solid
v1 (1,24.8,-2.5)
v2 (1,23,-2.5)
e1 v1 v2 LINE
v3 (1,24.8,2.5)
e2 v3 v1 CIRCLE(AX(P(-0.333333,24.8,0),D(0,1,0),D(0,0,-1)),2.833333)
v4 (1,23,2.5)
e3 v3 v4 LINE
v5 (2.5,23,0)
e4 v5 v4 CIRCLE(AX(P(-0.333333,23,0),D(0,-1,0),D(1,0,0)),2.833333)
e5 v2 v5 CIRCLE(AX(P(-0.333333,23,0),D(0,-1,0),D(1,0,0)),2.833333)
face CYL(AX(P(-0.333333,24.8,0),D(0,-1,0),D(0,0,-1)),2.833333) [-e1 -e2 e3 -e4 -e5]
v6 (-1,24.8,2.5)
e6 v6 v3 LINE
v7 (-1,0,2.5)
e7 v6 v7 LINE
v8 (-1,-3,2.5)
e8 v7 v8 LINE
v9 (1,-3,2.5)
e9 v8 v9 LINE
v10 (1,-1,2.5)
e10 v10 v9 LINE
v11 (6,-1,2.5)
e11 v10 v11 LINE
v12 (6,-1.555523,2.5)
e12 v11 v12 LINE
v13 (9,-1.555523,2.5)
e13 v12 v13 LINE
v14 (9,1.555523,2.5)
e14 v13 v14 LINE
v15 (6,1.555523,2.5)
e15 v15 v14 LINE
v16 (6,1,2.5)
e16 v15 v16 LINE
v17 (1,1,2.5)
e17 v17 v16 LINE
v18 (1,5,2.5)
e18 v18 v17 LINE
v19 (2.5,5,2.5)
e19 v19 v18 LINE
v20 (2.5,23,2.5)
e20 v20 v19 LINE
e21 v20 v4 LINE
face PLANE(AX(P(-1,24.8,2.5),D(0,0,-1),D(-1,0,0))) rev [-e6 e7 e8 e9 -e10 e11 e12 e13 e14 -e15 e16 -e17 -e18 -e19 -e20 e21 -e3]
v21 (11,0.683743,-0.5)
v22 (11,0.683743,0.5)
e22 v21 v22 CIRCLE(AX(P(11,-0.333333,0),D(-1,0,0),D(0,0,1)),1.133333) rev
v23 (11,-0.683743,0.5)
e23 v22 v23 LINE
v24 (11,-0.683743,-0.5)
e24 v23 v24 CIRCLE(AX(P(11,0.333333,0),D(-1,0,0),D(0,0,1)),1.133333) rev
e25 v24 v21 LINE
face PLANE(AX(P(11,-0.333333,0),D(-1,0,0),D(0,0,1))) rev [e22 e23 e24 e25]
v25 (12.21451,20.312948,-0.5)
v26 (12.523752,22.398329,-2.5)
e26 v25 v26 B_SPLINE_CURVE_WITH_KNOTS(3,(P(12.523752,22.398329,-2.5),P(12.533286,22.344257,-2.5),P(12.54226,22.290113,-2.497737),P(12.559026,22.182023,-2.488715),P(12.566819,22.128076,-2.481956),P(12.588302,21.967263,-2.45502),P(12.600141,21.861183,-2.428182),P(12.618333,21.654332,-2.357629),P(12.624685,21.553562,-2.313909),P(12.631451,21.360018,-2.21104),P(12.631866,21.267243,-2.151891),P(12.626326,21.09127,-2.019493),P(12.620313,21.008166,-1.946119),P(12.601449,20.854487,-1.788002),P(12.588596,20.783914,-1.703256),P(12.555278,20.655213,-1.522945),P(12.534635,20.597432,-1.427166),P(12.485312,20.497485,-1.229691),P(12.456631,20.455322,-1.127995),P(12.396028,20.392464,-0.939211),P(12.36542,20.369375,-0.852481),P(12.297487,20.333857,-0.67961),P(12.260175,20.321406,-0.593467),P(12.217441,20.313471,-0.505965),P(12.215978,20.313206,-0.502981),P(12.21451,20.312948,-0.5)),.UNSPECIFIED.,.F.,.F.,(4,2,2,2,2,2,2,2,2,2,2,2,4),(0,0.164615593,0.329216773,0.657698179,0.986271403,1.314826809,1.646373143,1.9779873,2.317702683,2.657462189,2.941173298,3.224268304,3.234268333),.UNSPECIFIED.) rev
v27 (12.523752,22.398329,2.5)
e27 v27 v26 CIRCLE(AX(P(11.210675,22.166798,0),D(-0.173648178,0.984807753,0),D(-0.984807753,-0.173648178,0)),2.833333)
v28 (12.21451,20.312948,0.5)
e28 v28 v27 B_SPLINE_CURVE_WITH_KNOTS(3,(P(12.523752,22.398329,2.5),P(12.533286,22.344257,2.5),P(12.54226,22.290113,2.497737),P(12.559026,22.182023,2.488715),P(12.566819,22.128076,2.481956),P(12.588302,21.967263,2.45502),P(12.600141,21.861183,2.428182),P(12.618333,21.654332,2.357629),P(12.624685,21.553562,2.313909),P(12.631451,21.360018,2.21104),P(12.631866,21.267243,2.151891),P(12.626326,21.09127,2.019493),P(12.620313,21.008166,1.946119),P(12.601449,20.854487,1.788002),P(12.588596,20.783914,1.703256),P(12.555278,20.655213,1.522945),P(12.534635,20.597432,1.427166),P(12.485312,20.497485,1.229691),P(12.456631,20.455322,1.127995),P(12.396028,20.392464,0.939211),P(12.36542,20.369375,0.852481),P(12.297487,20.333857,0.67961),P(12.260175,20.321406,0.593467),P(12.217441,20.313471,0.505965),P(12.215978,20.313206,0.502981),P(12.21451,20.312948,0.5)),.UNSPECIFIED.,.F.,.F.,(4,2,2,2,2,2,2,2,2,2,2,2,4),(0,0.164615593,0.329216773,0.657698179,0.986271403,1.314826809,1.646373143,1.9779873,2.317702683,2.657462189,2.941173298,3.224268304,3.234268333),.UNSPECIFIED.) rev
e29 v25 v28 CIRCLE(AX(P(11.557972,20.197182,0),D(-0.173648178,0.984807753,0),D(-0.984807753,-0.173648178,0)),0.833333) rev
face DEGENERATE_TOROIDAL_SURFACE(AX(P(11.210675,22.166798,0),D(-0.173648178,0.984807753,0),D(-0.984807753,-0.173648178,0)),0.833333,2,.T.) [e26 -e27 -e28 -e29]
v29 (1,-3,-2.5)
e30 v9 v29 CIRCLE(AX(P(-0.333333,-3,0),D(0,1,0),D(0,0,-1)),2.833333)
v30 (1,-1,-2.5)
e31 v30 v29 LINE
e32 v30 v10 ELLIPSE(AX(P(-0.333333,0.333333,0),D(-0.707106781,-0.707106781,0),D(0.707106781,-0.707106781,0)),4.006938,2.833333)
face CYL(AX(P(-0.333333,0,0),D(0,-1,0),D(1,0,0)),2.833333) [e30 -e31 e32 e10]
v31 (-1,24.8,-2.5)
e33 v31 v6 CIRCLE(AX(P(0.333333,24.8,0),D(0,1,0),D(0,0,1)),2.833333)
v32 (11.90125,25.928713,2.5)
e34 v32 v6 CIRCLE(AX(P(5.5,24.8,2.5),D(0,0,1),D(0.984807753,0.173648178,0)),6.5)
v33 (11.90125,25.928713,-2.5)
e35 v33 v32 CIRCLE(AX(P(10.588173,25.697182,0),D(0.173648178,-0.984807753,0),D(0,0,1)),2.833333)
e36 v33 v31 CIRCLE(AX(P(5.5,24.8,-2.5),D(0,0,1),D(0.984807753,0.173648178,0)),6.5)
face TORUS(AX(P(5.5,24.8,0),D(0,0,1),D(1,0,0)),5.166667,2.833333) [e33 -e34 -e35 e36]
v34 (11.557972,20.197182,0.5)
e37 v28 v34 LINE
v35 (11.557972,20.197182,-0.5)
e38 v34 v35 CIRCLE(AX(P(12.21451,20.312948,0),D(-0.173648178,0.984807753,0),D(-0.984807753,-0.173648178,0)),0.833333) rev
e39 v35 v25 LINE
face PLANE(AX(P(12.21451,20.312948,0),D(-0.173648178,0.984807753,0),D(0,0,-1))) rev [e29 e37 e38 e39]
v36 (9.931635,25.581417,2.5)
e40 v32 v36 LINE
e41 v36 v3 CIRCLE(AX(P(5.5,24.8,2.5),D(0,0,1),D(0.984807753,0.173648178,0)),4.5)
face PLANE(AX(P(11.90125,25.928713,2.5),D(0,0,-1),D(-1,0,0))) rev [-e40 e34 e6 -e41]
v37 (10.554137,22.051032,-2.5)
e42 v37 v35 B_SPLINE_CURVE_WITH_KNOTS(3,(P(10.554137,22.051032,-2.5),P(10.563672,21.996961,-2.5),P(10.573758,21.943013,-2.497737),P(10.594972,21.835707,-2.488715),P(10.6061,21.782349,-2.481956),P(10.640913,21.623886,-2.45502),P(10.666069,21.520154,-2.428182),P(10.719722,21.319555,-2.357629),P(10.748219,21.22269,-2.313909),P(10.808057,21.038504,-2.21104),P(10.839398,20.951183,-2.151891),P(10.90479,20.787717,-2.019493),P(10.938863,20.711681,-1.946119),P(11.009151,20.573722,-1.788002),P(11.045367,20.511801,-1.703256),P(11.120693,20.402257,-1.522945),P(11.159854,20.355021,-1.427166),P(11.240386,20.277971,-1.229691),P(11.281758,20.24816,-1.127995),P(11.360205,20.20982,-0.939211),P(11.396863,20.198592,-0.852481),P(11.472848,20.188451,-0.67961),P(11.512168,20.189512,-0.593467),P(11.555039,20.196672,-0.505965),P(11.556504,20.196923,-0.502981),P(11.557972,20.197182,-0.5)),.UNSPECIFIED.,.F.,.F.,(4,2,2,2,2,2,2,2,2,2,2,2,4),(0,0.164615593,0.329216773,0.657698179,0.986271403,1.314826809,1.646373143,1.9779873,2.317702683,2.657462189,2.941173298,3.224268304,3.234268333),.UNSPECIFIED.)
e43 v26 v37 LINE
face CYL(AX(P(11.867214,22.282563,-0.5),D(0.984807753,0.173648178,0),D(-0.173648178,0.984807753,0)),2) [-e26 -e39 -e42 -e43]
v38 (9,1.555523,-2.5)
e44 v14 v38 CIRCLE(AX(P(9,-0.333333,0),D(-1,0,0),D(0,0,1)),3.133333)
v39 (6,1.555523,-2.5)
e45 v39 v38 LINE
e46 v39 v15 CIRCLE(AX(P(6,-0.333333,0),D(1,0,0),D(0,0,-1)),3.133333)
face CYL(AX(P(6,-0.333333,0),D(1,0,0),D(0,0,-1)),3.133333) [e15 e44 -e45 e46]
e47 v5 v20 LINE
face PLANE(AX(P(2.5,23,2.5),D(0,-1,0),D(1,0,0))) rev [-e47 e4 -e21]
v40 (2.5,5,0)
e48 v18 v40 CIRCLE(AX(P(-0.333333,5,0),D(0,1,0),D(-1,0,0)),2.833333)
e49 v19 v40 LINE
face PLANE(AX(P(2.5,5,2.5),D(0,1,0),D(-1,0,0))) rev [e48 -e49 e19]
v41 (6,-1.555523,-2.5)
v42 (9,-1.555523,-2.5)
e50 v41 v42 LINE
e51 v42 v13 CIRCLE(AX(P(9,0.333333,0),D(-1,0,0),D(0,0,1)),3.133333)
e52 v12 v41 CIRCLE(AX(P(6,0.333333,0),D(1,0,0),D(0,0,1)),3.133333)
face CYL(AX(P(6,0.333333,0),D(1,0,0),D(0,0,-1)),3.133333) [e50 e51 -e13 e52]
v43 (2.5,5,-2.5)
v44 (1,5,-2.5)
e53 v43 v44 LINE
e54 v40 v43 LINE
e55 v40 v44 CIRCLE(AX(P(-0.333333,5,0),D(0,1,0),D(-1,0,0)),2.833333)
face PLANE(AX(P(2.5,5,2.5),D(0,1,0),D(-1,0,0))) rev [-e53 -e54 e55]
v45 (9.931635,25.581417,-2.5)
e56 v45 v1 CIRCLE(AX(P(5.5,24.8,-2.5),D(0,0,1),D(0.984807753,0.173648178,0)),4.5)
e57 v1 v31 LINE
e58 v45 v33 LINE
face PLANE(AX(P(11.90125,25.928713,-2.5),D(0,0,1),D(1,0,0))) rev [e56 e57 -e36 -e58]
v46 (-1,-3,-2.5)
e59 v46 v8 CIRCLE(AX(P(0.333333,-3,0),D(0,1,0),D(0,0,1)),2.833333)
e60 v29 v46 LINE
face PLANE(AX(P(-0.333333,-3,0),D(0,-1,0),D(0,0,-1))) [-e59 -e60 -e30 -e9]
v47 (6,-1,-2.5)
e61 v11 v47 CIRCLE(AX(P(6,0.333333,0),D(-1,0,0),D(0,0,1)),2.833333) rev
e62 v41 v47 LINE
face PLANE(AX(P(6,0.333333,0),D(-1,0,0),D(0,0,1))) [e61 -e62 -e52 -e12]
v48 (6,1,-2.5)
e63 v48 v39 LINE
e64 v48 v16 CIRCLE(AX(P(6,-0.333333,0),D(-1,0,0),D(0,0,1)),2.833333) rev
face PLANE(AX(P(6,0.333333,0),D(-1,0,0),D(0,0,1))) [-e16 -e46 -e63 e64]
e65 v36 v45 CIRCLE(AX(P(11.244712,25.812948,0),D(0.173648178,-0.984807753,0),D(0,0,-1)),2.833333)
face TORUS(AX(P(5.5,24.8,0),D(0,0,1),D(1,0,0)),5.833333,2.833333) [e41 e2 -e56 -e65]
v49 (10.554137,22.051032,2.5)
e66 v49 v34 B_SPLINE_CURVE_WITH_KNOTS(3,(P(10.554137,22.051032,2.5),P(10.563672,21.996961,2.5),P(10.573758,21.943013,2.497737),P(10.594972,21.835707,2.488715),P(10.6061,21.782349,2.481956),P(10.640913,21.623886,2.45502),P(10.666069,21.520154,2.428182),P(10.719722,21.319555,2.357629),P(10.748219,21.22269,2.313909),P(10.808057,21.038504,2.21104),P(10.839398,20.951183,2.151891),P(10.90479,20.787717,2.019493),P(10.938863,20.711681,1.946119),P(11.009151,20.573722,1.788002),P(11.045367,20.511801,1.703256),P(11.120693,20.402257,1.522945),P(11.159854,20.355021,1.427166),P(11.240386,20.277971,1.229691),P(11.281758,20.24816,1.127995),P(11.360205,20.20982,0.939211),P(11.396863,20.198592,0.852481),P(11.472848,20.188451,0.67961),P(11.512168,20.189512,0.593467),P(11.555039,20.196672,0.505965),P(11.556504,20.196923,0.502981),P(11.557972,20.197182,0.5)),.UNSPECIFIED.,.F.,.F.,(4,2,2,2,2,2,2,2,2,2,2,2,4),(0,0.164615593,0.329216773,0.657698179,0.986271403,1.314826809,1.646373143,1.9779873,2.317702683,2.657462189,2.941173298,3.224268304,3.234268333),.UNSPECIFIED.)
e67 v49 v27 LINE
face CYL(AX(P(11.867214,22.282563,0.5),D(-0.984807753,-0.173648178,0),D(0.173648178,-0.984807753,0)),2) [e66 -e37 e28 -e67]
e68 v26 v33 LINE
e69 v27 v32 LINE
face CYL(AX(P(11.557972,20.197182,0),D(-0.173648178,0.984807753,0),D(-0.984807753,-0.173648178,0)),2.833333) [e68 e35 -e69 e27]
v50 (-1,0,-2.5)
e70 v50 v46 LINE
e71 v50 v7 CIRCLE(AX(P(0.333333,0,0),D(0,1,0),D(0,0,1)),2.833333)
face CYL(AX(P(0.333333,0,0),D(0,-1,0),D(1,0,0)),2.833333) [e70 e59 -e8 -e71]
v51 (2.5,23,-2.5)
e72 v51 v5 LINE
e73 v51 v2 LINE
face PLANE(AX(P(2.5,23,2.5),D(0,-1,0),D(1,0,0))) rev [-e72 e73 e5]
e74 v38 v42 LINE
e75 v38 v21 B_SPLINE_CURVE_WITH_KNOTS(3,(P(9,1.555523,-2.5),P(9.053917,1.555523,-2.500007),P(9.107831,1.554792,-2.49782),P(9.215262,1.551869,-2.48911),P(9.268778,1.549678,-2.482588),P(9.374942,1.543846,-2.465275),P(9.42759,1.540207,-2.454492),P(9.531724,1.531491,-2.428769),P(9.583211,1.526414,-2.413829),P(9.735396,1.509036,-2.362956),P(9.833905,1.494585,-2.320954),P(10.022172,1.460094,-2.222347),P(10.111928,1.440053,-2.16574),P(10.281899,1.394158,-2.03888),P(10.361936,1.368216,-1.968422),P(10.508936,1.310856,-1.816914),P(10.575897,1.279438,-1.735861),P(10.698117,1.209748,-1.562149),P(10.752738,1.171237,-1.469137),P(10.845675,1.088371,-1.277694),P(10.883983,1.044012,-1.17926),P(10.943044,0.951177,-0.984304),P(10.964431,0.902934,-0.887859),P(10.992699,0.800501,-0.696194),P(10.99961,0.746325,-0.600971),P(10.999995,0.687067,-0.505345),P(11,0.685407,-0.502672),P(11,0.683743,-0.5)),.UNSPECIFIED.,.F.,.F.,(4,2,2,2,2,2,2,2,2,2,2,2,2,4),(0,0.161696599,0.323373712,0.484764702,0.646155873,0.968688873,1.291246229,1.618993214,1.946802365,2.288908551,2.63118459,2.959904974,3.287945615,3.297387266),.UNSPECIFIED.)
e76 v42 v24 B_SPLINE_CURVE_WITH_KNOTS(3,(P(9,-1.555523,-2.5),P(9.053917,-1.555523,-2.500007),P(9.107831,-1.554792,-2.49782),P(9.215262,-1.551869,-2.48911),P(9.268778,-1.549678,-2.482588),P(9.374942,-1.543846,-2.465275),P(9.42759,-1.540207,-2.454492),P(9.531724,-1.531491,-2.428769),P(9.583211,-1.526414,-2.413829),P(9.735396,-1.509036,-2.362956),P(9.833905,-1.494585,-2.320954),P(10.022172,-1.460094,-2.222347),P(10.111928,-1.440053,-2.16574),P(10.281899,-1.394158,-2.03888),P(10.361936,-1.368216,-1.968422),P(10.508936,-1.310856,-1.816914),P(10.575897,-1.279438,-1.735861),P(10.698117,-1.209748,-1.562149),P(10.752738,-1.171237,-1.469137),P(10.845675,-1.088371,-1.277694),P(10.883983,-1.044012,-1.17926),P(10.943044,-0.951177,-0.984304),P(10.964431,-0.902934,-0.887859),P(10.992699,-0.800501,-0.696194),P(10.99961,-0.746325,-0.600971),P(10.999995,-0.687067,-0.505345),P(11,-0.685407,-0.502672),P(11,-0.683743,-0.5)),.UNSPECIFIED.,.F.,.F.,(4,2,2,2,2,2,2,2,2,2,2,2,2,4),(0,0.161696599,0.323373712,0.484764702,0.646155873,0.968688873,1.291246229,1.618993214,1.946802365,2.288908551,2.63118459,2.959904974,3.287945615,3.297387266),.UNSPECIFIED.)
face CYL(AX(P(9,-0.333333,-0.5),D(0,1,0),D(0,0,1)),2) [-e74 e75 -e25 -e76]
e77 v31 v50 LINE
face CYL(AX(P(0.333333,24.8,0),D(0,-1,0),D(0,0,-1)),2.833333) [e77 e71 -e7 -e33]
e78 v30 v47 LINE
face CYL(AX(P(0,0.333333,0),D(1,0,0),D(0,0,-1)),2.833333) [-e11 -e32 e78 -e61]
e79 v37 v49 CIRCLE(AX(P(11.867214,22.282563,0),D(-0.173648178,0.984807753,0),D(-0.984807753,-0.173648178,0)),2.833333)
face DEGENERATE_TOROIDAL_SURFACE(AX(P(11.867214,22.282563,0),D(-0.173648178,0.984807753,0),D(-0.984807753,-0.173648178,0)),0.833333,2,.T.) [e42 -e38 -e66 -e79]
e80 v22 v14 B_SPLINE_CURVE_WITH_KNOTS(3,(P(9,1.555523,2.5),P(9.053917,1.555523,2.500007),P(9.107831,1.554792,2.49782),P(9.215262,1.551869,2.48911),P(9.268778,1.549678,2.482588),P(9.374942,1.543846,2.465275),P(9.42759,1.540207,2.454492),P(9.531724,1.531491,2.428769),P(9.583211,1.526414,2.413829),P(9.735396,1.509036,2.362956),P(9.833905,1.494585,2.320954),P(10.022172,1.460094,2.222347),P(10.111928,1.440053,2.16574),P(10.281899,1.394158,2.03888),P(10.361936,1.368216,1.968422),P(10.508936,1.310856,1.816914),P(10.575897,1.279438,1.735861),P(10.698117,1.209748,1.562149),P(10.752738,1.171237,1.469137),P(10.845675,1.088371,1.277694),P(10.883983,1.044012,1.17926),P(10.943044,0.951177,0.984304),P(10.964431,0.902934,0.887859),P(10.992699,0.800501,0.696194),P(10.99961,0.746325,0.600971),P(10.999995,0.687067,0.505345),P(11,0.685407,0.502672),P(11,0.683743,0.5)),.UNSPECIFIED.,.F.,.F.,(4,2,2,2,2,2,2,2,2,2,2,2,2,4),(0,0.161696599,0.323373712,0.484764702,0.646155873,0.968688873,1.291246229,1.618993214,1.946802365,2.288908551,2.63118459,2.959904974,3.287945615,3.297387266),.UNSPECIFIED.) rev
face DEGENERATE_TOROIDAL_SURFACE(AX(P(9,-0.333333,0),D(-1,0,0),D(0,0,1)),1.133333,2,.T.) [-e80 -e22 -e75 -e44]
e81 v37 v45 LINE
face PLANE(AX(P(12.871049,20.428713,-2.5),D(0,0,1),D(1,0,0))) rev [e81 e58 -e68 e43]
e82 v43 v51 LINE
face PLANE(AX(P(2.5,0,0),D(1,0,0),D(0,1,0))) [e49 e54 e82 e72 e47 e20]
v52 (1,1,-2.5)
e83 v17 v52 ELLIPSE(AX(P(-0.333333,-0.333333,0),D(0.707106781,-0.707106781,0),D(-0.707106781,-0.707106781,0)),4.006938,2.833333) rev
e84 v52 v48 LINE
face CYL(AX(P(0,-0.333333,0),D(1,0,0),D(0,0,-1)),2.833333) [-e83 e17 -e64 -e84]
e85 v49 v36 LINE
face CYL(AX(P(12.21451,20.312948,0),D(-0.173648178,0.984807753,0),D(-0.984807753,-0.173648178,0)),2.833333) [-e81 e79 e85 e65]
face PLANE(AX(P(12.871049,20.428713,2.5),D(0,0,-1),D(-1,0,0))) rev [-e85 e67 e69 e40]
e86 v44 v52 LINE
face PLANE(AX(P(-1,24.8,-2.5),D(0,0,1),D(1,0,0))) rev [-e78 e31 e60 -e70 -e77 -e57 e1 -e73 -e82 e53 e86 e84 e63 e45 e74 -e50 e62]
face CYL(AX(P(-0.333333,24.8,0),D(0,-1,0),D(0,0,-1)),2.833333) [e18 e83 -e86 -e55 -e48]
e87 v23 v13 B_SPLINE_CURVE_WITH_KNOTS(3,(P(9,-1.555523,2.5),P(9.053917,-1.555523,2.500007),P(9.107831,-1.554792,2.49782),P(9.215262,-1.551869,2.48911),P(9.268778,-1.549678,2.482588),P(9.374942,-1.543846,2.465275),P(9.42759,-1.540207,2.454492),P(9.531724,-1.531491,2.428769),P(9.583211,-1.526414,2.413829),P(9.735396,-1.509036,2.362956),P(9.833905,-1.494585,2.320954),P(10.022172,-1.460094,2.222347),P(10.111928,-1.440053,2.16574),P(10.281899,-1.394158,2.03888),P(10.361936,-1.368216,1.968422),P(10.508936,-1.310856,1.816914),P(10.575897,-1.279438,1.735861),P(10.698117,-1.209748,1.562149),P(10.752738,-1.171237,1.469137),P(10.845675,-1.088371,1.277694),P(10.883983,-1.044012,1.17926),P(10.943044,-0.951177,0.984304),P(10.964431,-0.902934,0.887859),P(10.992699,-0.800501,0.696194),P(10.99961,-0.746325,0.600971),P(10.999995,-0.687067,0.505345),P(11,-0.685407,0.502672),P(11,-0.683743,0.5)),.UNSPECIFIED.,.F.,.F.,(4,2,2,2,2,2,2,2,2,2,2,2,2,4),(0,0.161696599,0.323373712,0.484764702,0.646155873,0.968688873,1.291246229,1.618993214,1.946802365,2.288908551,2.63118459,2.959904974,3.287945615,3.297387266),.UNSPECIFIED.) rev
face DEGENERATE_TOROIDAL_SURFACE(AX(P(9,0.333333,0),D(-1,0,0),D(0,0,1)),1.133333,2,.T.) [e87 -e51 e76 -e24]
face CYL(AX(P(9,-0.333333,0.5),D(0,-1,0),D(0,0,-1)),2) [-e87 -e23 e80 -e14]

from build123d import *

# Parameters (mm, degrees)
EXTRUDE_1_DEPTH = 5
SKETCH_19_W     = 5
SKETCH_19_H     = 18
EXTRUDE_2_DEPTH = 1.5
FILLET_2_R      = 2


with BuildPart() as part:
    # 扫描2: sweep along a path in 草图1
    with BuildLine(Plane.XY) as sweep_2_path:
        Line((11.886241035, 20.255064977), (10.916442642, 25.755064977))
        ThreePointArc((10.916442642, 25.755064977), (5.020643415, 30.27907084), (0, 24.8))
        Line((0, 24.8), (0, 0))
        Line((0, 0), (0, -3))
    # 草图13 → 扫描2 (sweep)
    with BuildSketch(Plane(origin=(0, -3, 0), x_dir=(1, 0, 0), z_dir=(0, 1, 0))):
        with BuildLine():
            Line((-1, -2.5), (1, -2.5))
            ThreePointArc((1, -2.5), (2.5, 0), (1, 2.5))
            Line((1, 2.5), (-1, 2.5))
            ThreePointArc((-1, 2.5), (-2.5, 0), (-1, -2.5))
        make_face()
    sweep(path=sweep_2_path.line)

    # 扫描4: sweep along a path in 草图15
    with BuildLine(Plane.XY) as sweep_4_path:
        Line((0, 0), (11, 0))
    # 草图16 → 扫描4 (sweep)
    with BuildSketch(Plane(origin=(11, 0, 0), x_dir=(0, 0, -1), z_dir=(1, 0, 0))):
        with BuildLine():
            Line((-2.5, -1), (-2.5, 1))
            ThreePointArc((-2.5, 1), (0, 2.5), (2.5, 1))
            Line((2.5, 1), (2.5, -1))
            ThreePointArc((2.5, -1), (0, -2.5), (-2.5, -1))
        make_face()
    sweep(path=sweep_4_path.line)

    # 草图17 → 凸台-拉伸1 (add)
    with BuildSketch(Plane(origin=(11, 0, 0), x_dir=(0, 0, -1), z_dir=(1, 0, 0))):
        with BuildLine():
            Line((-2.5, 1.555522876), (-2.5, -1.555522876))
            ThreePointArc((-2.5, -1.555522876), (0, -2.8), (2.5, -1.555522876))
            Line((2.5, -1.555522876), (2.5, 1.555522876))
            ThreePointArc((2.5, 1.555522876), (0, 2.8), (-2.5, 1.555522876))
        make_face()
    extrude(amount=-EXTRUDE_1_DEPTH)

    # 草图19 → 凸台-拉伸2 (add)
    with BuildSketch(Plane(origin=(1, 0, 0), x_dir=(0, 0, -1), z_dir=(1, 0, 0))):
        with Locations((0, 14)):
            Rectangle(SKETCH_19_W, SKETCH_19_H)
    extrude(amount=EXTRUDE_2_DEPTH)

    # 圆角2
    # the kernel refuses this fillet: 2 mm, written as the material it takes off along each edge
    with BuildSketch(Plane(origin=(17.795087554, 21.296954043, 2.5), x_dir=(0, 0, -1), z_dir=(-0.9848077530122092, -0.17364817766692373, 0))) as fillet_2_piece_1:
        with BuildLine():
            CenterArc((FILLET_2_R, -FILLET_2_R), FILLET_2_R, 90, 90)
            Line((0, -FILLET_2_R), (0, 0))
            Line((0, 0), (FILLET_2_R, 0))
        make_face()
    extrude(amount=12, mode=Mode.SUBTRACT)
    with BuildSketch(Plane(origin=(12.214510286, 20.312947703, 0), x_dir=(0.9423506208781959, 0.16616183974819204, -0.29045748456869663), z_dir=(0.2860447827236766, 0.05043741288507259, 0.9568878981667733))) as fillet_2_piece_2:
        with BuildLine():
            CenterArc((2.833333333 - FILLET_2_R, FILLET_2_R), FILLET_2_R, 270, 90)
            Line((2.833333333 - FILLET_2_R, 0), (2.833333333, 0))
            Line((2.833333333, 0), (2.833333333, FILLET_2_R))
        make_face()
    revolve(axis=Axis((12.214510286, 20.312947703, 0), (-0.173648177666923, 0.9848077530122094, 0)), revolution_arc=326.229306127, mode=Mode.SUBTRACT)
    with BuildSketch(Plane(origin=(5.977394517, 19.213175911, -2.5), x_dir=(-0.17364817766692373, 0.9848077530122092, 0), z_dir=(0.9848077530122092, 0.17364817766692373, 0))) as fillet_2_piece_3:
        with BuildLine():
            CenterArc((FILLET_2_R, FILLET_2_R), FILLET_2_R, 180, 90)
            Line((0, FILLET_2_R), (0, 0))
            Line((0, 0), (FILLET_2_R, 0))
        make_face()
    extrude(amount=12, mode=Mode.SUBTRACT)
    with BuildSketch(Plane(origin=(11, -6.555522876, 2.5), x_dir=(0, 0, -1), z_dir=(0, 1, 0))) as fillet_2_piece_4:
        with BuildLine():
            CenterArc((FILLET_2_R, FILLET_2_R), FILLET_2_R, 180, 90)
            Line((0, FILLET_2_R), (0, 0))
            Line((0, 0), (FILLET_2_R, 0))
        make_face()
    extrude(amount=13.111045751, mode=Mode.SUBTRACT)
    with BuildSketch(Plane(origin=(11, 6.555522876, -2.5), x_dir=(-1, 0, 0), z_dir=(0, -1, 0))) as fillet_2_piece_5:
        with BuildLine():
            CenterArc((FILLET_2_R, -FILLET_2_R), FILLET_2_R, 90, 90)
            Line((0, -FILLET_2_R), (0, 0))
            Line((0, 0), (FILLET_2_R, 0))
        make_face()
    extrude(amount=13.111045751, mode=Mode.SUBTRACT)
    with BuildSketch(Plane(origin=(11, -0.333333333, 0), x_dir=(0, -0.8131785022115455, -0.582014367125922), z_dir=(0, -0.582014367125922, 0.8131785022115455))) as fillet_2_piece_6:
        with BuildLine():
            CenterArc((3.133333333 - FILLET_2_R, -FILLET_2_R), FILLET_2_R, 0, 90)
            Line((3.133333333, -FILLET_2_R), (3.133333333, 0))
            Line((3.133333333, 0), (3.133333333 - FILLET_2_R, 0))
        make_face()
    revolve(axis=Axis((11, -0.333333333, 0), (1, 0, 0)), revolution_arc=288.815304863, mode=Mode.SUBTRACT)
    with BuildSketch(Plane(origin=(11, 0.333333333, 0), x_dir=(0, 0.8131785022115376, 0.5820143671259329), z_dir=(0, 0.5820143671259329, -0.8131785022115376))) as fillet_2_piece_7:
        with BuildLine():
            CenterArc((3.133333333 - FILLET_2_R, -FILLET_2_R), FILLET_2_R, 0, 90)
            Line((3.133333333 - FILLET_2_R, 0), (3.133333333, 0))
            Line((3.133333333, 0), (3.133333333, -FILLET_2_R))
        make_face()
    revolve(axis=Axis((11, 0.333333333, 0), (1, 0, 0)), revolution_arc=288.815304863, mode=Mode.SUBTRACT)
    with BuildSketch(Plane(origin=(11.557971784, 20.197182251, 0), x_dir=(-0.9423506208781961, -0.16616183974819207, 0.2904574845686964), z_dir=(-0.2860447827236764, -0.05043741288507257, -0.9568878981667737))) as fillet_2_piece_8:
        with BuildLine():
            CenterArc((2.833333333 - FILLET_2_R, FILLET_2_R), FILLET_2_R, 270, 90)
            Line((2.833333333, FILLET_2_R), (2.833333333, 0))
            Line((2.833333333, 0), (2.833333333 - FILLET_2_R, 0))
        make_face()
    revolve(axis=Axis((11.557971784, 20.197182251, 0), (-0.17364817766692306, 0.9848077530122095, 0)), revolution_arc=326.229306127, mode=Mode.SUBTRACT)


solid = part.part
